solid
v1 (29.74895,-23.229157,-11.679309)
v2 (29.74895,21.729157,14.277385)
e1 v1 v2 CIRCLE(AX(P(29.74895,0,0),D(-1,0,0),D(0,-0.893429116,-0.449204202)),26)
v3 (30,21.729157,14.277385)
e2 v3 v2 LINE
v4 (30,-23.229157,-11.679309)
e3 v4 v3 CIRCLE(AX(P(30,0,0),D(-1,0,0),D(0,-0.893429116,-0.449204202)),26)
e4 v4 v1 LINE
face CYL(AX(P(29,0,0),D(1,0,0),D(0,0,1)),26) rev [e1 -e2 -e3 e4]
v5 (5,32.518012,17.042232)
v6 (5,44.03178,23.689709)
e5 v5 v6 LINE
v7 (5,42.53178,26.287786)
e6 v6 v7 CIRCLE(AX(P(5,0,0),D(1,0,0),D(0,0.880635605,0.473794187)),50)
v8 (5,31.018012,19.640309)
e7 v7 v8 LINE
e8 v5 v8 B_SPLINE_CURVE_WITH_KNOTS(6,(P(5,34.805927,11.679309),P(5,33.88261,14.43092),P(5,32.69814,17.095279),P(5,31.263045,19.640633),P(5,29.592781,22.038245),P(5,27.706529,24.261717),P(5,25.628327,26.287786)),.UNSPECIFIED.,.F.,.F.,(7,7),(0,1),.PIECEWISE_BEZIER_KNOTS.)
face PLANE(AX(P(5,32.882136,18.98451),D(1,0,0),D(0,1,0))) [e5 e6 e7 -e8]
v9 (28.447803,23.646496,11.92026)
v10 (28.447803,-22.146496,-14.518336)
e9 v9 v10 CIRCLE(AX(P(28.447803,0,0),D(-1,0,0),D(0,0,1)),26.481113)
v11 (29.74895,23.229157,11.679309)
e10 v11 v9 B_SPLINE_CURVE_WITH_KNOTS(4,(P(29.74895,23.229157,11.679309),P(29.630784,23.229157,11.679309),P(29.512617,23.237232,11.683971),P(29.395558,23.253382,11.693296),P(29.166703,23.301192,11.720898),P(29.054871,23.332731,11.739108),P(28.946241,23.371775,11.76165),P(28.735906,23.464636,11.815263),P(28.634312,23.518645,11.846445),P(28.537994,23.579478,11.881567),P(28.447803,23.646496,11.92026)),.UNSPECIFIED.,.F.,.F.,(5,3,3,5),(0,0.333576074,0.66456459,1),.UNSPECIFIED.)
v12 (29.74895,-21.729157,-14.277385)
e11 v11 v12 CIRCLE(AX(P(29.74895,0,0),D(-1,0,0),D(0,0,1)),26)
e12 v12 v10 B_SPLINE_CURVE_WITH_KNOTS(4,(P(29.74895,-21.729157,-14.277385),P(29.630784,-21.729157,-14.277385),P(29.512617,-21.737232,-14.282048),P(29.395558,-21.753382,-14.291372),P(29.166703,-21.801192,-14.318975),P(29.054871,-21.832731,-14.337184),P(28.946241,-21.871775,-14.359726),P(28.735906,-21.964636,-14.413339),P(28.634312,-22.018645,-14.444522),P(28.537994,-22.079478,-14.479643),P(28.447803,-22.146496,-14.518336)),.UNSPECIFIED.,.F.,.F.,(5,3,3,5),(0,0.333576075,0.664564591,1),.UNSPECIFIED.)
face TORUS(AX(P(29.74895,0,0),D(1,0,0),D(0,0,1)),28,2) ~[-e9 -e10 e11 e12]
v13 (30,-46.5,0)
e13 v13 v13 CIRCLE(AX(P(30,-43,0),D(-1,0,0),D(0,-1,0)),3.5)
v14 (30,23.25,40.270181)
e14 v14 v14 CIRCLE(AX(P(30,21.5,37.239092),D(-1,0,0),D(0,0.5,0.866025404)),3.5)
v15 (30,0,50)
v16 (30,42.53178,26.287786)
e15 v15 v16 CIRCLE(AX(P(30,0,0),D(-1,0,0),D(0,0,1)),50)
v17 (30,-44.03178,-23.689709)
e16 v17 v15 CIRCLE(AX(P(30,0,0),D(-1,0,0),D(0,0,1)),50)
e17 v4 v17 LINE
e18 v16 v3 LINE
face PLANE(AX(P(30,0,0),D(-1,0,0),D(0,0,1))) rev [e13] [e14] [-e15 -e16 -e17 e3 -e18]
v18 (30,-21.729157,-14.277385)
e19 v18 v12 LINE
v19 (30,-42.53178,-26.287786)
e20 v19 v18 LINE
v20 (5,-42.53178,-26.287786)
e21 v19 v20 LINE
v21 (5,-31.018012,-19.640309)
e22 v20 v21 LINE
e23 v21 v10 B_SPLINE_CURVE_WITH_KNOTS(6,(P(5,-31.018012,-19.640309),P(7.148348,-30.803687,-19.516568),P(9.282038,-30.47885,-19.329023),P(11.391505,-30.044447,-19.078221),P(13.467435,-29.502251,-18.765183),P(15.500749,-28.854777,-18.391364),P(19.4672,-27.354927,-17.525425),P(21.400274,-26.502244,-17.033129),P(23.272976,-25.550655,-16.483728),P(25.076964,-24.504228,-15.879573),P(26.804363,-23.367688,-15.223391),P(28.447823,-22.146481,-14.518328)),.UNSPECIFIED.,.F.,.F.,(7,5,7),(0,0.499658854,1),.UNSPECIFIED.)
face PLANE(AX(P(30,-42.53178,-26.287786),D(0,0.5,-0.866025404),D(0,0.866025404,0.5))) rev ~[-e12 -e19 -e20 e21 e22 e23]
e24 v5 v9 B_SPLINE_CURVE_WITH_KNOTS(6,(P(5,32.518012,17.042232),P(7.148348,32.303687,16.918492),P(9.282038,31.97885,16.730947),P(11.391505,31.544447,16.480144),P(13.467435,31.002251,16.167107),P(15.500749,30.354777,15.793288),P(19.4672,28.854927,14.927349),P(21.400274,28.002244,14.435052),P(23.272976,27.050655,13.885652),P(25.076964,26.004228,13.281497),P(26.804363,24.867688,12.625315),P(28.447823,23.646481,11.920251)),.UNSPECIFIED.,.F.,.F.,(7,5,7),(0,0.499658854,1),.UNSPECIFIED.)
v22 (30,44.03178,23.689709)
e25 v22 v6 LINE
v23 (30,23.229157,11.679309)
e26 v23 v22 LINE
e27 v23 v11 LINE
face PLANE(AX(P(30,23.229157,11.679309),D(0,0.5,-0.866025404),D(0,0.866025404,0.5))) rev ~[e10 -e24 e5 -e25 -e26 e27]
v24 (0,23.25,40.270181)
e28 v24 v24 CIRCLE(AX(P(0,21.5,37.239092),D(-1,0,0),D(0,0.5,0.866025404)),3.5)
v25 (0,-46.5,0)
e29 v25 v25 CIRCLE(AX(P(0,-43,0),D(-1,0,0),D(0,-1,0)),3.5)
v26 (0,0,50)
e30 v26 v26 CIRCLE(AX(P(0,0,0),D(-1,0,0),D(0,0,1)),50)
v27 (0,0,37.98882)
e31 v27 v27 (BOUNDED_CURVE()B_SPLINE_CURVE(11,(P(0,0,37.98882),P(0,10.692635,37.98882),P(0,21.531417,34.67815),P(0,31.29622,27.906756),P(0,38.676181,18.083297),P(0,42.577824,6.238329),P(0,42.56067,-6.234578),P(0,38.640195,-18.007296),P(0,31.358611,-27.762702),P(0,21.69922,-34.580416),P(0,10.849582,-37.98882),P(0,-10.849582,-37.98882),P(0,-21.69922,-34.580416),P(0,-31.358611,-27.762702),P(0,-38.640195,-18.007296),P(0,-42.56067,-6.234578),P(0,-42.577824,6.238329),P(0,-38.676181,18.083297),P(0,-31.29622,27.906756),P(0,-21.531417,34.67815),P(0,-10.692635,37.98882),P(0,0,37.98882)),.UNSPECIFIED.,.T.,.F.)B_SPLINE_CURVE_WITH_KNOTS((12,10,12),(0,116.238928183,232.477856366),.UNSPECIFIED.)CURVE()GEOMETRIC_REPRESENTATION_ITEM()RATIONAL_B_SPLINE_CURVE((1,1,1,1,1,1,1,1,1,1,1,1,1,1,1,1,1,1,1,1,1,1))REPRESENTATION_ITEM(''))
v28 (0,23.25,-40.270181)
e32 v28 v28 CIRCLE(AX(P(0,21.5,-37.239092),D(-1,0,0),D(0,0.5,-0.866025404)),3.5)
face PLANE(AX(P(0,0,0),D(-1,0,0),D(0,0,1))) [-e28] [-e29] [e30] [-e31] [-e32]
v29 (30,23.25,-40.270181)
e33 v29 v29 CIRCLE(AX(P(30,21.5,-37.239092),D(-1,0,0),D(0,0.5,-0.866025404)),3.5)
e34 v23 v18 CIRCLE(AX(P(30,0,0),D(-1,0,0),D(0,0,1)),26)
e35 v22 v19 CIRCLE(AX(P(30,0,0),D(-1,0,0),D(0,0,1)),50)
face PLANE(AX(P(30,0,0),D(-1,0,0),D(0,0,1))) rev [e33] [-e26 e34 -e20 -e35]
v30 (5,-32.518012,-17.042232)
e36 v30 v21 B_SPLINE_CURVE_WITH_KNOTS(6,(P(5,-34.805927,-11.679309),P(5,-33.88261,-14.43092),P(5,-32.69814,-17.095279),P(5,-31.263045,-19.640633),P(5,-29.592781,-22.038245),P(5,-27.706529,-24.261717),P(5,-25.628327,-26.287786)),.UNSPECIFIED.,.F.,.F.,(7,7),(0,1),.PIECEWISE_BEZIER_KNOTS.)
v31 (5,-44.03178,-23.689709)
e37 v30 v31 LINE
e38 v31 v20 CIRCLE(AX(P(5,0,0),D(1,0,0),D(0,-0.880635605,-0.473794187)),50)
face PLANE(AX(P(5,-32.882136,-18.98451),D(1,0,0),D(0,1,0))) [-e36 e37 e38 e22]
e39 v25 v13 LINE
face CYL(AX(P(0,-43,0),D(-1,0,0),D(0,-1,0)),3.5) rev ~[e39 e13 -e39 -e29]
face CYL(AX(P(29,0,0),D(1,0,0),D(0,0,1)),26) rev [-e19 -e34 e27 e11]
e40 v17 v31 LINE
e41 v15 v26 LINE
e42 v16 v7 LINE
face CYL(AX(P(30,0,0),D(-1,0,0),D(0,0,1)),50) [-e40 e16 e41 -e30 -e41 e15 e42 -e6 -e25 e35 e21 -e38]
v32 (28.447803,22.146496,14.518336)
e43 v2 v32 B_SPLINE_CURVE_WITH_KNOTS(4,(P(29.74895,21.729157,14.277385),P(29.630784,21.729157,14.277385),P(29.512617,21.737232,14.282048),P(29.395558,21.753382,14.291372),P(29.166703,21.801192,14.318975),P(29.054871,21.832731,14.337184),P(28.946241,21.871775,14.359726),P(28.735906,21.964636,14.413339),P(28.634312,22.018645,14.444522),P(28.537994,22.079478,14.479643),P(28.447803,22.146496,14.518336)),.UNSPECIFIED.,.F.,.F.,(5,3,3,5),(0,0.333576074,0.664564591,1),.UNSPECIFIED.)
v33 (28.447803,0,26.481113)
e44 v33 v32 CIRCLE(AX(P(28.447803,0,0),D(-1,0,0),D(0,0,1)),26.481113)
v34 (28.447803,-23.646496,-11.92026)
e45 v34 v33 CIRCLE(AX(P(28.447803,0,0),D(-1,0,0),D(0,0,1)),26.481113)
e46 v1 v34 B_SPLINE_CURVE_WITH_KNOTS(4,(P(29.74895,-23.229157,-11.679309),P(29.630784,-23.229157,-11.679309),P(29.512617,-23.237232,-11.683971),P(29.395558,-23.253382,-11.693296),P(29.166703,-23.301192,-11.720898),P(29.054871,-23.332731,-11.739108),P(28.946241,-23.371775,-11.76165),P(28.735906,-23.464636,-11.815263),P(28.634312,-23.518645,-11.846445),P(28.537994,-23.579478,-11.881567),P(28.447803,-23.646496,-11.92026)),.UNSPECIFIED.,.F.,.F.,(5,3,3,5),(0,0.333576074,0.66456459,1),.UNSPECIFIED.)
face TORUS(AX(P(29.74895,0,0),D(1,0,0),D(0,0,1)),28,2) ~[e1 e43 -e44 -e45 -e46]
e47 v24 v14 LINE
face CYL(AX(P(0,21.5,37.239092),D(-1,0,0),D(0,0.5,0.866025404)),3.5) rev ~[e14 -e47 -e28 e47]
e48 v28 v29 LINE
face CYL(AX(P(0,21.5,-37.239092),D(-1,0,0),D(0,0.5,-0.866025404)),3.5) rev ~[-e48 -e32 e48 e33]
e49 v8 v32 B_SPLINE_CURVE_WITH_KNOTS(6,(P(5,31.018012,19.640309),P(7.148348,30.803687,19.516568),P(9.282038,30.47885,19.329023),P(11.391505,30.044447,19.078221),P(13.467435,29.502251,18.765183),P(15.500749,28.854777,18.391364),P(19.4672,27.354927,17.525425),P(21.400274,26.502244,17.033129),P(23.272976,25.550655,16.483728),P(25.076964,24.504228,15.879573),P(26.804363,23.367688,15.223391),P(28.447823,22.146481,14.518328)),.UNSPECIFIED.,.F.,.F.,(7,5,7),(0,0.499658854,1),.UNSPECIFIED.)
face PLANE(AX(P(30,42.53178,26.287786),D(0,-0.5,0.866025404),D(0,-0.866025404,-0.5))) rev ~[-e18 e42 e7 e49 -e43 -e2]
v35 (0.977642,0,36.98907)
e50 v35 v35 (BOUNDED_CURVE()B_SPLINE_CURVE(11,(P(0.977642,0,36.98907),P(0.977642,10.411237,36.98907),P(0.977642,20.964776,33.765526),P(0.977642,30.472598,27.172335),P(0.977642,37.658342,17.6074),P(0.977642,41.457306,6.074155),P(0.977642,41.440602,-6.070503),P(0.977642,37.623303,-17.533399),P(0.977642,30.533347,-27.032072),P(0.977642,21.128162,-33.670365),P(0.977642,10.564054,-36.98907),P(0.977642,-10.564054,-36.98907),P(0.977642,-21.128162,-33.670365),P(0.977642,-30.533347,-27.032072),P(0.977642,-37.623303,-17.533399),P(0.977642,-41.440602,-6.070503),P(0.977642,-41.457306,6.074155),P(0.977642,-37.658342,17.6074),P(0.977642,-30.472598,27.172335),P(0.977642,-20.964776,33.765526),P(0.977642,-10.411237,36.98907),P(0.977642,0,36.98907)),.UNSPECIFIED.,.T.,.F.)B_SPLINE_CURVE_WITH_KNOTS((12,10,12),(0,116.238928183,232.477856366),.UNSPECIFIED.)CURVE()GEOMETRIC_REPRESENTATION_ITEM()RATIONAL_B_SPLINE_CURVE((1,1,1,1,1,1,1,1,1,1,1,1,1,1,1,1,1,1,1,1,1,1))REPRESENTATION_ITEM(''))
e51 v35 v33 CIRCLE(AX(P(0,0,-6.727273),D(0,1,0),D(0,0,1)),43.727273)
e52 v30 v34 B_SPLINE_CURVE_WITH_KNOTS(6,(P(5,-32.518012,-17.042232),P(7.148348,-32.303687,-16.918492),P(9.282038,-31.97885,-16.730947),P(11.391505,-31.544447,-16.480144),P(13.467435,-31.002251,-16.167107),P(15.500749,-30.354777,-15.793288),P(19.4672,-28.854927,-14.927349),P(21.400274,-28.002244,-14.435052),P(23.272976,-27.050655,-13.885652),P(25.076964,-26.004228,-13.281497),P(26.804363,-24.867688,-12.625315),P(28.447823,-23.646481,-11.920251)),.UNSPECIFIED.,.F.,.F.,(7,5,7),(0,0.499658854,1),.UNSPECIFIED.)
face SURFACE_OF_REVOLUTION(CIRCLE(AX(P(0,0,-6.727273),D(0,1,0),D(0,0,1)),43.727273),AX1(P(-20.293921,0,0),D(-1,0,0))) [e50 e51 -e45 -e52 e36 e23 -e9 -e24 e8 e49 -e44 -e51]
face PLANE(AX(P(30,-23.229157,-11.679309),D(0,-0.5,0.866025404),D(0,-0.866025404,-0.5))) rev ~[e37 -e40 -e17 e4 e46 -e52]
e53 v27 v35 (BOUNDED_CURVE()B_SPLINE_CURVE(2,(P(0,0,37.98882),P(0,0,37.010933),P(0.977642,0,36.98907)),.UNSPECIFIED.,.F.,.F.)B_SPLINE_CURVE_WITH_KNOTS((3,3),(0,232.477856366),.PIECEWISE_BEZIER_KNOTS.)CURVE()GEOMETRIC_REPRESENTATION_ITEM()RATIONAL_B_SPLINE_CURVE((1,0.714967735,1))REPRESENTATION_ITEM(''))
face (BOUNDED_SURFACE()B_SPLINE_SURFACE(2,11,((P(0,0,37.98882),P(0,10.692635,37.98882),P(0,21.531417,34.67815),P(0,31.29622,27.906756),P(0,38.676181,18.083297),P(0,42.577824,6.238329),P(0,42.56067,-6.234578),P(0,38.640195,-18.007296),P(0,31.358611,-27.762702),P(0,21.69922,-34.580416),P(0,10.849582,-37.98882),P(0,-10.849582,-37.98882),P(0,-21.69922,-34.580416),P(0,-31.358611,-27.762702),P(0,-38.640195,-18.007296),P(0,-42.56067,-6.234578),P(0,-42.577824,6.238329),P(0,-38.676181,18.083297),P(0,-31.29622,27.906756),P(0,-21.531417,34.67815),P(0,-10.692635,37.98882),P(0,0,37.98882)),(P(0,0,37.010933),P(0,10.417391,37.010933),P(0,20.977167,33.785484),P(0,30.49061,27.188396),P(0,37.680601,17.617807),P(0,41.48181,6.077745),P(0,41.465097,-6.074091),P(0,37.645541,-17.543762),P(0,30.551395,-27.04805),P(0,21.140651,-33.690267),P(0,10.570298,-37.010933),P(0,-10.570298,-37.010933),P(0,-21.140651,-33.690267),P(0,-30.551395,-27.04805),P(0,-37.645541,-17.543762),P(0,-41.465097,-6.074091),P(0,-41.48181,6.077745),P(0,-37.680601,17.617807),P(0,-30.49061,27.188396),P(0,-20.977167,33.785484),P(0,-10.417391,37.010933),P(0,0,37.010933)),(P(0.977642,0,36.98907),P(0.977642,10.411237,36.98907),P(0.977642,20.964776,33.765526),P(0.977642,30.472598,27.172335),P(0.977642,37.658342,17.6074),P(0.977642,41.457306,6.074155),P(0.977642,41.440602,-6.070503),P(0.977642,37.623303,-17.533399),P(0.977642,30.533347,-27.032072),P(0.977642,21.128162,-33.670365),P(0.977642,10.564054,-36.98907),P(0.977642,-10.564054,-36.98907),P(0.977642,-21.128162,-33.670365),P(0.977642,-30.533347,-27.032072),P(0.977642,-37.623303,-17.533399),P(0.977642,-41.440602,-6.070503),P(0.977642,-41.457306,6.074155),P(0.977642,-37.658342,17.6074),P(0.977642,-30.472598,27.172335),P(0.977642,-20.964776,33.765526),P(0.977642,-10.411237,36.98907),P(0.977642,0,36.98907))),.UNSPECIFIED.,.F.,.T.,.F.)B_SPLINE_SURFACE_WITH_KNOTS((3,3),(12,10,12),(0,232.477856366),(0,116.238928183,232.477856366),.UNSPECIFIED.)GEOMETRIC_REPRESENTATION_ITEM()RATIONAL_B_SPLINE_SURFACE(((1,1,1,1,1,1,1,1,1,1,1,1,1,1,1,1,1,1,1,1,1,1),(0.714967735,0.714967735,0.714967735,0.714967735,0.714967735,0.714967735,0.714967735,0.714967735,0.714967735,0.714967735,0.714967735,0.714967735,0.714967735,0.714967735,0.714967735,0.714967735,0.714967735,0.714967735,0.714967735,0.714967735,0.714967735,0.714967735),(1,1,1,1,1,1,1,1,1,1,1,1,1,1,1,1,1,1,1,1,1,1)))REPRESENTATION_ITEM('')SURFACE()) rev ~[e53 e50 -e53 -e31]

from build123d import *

# Parameters (mm, degrees)
F3_R            = 1
F4_R            = 3.5
F5_DEPTH        = 30.001
F5_COPIES_COUNT = 3
F7_DEPTH        = 25


# Not quite as in the source:
# - a fillet or chamfer that OpenCascade refuses, or shapes differently, is made with other operations: its cross-section is extruded or revolved along the edge and cut away or added
# - a pattern or mirror of a feature is missing from the dataset's text; its kind, count and spacing are read off the source's solid


with BuildPart() as f1:
    # F0 (on Front) → F1 (revolve)
    with BuildSketch(Plane.XZ):
        with BuildLine():
            Line((30, 50), (0, 50))
            Line((0, 50), (0, 37))
            ThreePointArc((0, 37), (15.5080624193, 34.1576191054), (29, 26))
            Line((29, 26), (30, 26))
            Line((30, 26), (30, 50))
        make_face()
    revolve(axis=Axis((-20.2939212322, 0, 0), (-1, 0, 0)))

    # F2: fillet of radius 2 on 1 edges, made by hand

    # F2_s1 → F2_t2 (revolve, cut)
    with BuildSketch(Plane.XZ):
        with BuildLine():
            ThreePointArc((29.7489495613, 26), (29.0553262341, 26.1241304203), (28.447802662, 26.4811133201))
            ThreePointArc((28.447802662, 26.4811133201), (28.7249086192, 26.241712774), (29, 26))
            Line((29, 26), (29.7489495613, 26))
        make_face()
    revolve(axis=Axis((29, 0, 0), (-1, 0, 0)), mode=Mode.SUBTRACT)

    # F3
    f3_edges = [f1.edges().sort_by_distance(p)[0] for p in [
        (0, 0, -37),
    ]]
    fillet(f3_edges, radius=F3_R)

    # F4 (on face) → F5 (cut, through all)
    with BuildSketch(Plane(origin=(0, 0, 0), x_dir=(0, -1, 0), z_dir=(-1, 0, 0))):
        with Locations((43, 0)):
            Circle(F4_R)
    f5 = extrude(amount=-F5_DEPTH, mode=Mode.SUBTRACT)

    # F5_copies: F5 ×3 about axis
    f5_copies_axis = Axis((0, 0, 0), (1, 0, 0))
    for i in range(1, F5_COPIES_COUNT):
        add(f5.rotate(f5_copies_axis, i * 360 / F5_COPIES_COUNT), mode=Mode.SUBTRACT)

    # F6 (on face) → F7 (cut)
    with BuildSketch(Plane.YZ.offset(30)):
        with BuildLine():
            ThreePointArc((44.0317802314, 23.6897093619), (43.3012701892, 25), (42.5317802314, 26.2877855733))
            Line((42.5317802314, 26.2877855733), (21.7291570127, 14.2773854581))
            ThreePointArc((21.7291570127, 14.2773854581), (22.5166604984, 13), (23.2291570127, 11.6793092467))
            Line((23.2291570127, 11.6793092467), (44.0317802314, 23.6897093619))
        make_face()
        with BuildLine():
            Line((-23.2291570127, -11.6793092467), (-44.0317802314, -23.6897093619))
            ThreePointArc((-44.0317802314, -23.6897093619), (-43.3012701892, -25), (-42.5317802314, -26.2877855733))
            Line((-42.5317802314, -26.2877855733), (-21.7291570127, -14.2773854581))
            ThreePointArc((-21.7291570127, -14.2773854581), (-22.5166604984, -13), (-23.2291570127, -11.6793092467))
        make_face()
    extrude(amount=-F7_DEPTH, mode=Mode.SUBTRACT)


solid = f1.part
